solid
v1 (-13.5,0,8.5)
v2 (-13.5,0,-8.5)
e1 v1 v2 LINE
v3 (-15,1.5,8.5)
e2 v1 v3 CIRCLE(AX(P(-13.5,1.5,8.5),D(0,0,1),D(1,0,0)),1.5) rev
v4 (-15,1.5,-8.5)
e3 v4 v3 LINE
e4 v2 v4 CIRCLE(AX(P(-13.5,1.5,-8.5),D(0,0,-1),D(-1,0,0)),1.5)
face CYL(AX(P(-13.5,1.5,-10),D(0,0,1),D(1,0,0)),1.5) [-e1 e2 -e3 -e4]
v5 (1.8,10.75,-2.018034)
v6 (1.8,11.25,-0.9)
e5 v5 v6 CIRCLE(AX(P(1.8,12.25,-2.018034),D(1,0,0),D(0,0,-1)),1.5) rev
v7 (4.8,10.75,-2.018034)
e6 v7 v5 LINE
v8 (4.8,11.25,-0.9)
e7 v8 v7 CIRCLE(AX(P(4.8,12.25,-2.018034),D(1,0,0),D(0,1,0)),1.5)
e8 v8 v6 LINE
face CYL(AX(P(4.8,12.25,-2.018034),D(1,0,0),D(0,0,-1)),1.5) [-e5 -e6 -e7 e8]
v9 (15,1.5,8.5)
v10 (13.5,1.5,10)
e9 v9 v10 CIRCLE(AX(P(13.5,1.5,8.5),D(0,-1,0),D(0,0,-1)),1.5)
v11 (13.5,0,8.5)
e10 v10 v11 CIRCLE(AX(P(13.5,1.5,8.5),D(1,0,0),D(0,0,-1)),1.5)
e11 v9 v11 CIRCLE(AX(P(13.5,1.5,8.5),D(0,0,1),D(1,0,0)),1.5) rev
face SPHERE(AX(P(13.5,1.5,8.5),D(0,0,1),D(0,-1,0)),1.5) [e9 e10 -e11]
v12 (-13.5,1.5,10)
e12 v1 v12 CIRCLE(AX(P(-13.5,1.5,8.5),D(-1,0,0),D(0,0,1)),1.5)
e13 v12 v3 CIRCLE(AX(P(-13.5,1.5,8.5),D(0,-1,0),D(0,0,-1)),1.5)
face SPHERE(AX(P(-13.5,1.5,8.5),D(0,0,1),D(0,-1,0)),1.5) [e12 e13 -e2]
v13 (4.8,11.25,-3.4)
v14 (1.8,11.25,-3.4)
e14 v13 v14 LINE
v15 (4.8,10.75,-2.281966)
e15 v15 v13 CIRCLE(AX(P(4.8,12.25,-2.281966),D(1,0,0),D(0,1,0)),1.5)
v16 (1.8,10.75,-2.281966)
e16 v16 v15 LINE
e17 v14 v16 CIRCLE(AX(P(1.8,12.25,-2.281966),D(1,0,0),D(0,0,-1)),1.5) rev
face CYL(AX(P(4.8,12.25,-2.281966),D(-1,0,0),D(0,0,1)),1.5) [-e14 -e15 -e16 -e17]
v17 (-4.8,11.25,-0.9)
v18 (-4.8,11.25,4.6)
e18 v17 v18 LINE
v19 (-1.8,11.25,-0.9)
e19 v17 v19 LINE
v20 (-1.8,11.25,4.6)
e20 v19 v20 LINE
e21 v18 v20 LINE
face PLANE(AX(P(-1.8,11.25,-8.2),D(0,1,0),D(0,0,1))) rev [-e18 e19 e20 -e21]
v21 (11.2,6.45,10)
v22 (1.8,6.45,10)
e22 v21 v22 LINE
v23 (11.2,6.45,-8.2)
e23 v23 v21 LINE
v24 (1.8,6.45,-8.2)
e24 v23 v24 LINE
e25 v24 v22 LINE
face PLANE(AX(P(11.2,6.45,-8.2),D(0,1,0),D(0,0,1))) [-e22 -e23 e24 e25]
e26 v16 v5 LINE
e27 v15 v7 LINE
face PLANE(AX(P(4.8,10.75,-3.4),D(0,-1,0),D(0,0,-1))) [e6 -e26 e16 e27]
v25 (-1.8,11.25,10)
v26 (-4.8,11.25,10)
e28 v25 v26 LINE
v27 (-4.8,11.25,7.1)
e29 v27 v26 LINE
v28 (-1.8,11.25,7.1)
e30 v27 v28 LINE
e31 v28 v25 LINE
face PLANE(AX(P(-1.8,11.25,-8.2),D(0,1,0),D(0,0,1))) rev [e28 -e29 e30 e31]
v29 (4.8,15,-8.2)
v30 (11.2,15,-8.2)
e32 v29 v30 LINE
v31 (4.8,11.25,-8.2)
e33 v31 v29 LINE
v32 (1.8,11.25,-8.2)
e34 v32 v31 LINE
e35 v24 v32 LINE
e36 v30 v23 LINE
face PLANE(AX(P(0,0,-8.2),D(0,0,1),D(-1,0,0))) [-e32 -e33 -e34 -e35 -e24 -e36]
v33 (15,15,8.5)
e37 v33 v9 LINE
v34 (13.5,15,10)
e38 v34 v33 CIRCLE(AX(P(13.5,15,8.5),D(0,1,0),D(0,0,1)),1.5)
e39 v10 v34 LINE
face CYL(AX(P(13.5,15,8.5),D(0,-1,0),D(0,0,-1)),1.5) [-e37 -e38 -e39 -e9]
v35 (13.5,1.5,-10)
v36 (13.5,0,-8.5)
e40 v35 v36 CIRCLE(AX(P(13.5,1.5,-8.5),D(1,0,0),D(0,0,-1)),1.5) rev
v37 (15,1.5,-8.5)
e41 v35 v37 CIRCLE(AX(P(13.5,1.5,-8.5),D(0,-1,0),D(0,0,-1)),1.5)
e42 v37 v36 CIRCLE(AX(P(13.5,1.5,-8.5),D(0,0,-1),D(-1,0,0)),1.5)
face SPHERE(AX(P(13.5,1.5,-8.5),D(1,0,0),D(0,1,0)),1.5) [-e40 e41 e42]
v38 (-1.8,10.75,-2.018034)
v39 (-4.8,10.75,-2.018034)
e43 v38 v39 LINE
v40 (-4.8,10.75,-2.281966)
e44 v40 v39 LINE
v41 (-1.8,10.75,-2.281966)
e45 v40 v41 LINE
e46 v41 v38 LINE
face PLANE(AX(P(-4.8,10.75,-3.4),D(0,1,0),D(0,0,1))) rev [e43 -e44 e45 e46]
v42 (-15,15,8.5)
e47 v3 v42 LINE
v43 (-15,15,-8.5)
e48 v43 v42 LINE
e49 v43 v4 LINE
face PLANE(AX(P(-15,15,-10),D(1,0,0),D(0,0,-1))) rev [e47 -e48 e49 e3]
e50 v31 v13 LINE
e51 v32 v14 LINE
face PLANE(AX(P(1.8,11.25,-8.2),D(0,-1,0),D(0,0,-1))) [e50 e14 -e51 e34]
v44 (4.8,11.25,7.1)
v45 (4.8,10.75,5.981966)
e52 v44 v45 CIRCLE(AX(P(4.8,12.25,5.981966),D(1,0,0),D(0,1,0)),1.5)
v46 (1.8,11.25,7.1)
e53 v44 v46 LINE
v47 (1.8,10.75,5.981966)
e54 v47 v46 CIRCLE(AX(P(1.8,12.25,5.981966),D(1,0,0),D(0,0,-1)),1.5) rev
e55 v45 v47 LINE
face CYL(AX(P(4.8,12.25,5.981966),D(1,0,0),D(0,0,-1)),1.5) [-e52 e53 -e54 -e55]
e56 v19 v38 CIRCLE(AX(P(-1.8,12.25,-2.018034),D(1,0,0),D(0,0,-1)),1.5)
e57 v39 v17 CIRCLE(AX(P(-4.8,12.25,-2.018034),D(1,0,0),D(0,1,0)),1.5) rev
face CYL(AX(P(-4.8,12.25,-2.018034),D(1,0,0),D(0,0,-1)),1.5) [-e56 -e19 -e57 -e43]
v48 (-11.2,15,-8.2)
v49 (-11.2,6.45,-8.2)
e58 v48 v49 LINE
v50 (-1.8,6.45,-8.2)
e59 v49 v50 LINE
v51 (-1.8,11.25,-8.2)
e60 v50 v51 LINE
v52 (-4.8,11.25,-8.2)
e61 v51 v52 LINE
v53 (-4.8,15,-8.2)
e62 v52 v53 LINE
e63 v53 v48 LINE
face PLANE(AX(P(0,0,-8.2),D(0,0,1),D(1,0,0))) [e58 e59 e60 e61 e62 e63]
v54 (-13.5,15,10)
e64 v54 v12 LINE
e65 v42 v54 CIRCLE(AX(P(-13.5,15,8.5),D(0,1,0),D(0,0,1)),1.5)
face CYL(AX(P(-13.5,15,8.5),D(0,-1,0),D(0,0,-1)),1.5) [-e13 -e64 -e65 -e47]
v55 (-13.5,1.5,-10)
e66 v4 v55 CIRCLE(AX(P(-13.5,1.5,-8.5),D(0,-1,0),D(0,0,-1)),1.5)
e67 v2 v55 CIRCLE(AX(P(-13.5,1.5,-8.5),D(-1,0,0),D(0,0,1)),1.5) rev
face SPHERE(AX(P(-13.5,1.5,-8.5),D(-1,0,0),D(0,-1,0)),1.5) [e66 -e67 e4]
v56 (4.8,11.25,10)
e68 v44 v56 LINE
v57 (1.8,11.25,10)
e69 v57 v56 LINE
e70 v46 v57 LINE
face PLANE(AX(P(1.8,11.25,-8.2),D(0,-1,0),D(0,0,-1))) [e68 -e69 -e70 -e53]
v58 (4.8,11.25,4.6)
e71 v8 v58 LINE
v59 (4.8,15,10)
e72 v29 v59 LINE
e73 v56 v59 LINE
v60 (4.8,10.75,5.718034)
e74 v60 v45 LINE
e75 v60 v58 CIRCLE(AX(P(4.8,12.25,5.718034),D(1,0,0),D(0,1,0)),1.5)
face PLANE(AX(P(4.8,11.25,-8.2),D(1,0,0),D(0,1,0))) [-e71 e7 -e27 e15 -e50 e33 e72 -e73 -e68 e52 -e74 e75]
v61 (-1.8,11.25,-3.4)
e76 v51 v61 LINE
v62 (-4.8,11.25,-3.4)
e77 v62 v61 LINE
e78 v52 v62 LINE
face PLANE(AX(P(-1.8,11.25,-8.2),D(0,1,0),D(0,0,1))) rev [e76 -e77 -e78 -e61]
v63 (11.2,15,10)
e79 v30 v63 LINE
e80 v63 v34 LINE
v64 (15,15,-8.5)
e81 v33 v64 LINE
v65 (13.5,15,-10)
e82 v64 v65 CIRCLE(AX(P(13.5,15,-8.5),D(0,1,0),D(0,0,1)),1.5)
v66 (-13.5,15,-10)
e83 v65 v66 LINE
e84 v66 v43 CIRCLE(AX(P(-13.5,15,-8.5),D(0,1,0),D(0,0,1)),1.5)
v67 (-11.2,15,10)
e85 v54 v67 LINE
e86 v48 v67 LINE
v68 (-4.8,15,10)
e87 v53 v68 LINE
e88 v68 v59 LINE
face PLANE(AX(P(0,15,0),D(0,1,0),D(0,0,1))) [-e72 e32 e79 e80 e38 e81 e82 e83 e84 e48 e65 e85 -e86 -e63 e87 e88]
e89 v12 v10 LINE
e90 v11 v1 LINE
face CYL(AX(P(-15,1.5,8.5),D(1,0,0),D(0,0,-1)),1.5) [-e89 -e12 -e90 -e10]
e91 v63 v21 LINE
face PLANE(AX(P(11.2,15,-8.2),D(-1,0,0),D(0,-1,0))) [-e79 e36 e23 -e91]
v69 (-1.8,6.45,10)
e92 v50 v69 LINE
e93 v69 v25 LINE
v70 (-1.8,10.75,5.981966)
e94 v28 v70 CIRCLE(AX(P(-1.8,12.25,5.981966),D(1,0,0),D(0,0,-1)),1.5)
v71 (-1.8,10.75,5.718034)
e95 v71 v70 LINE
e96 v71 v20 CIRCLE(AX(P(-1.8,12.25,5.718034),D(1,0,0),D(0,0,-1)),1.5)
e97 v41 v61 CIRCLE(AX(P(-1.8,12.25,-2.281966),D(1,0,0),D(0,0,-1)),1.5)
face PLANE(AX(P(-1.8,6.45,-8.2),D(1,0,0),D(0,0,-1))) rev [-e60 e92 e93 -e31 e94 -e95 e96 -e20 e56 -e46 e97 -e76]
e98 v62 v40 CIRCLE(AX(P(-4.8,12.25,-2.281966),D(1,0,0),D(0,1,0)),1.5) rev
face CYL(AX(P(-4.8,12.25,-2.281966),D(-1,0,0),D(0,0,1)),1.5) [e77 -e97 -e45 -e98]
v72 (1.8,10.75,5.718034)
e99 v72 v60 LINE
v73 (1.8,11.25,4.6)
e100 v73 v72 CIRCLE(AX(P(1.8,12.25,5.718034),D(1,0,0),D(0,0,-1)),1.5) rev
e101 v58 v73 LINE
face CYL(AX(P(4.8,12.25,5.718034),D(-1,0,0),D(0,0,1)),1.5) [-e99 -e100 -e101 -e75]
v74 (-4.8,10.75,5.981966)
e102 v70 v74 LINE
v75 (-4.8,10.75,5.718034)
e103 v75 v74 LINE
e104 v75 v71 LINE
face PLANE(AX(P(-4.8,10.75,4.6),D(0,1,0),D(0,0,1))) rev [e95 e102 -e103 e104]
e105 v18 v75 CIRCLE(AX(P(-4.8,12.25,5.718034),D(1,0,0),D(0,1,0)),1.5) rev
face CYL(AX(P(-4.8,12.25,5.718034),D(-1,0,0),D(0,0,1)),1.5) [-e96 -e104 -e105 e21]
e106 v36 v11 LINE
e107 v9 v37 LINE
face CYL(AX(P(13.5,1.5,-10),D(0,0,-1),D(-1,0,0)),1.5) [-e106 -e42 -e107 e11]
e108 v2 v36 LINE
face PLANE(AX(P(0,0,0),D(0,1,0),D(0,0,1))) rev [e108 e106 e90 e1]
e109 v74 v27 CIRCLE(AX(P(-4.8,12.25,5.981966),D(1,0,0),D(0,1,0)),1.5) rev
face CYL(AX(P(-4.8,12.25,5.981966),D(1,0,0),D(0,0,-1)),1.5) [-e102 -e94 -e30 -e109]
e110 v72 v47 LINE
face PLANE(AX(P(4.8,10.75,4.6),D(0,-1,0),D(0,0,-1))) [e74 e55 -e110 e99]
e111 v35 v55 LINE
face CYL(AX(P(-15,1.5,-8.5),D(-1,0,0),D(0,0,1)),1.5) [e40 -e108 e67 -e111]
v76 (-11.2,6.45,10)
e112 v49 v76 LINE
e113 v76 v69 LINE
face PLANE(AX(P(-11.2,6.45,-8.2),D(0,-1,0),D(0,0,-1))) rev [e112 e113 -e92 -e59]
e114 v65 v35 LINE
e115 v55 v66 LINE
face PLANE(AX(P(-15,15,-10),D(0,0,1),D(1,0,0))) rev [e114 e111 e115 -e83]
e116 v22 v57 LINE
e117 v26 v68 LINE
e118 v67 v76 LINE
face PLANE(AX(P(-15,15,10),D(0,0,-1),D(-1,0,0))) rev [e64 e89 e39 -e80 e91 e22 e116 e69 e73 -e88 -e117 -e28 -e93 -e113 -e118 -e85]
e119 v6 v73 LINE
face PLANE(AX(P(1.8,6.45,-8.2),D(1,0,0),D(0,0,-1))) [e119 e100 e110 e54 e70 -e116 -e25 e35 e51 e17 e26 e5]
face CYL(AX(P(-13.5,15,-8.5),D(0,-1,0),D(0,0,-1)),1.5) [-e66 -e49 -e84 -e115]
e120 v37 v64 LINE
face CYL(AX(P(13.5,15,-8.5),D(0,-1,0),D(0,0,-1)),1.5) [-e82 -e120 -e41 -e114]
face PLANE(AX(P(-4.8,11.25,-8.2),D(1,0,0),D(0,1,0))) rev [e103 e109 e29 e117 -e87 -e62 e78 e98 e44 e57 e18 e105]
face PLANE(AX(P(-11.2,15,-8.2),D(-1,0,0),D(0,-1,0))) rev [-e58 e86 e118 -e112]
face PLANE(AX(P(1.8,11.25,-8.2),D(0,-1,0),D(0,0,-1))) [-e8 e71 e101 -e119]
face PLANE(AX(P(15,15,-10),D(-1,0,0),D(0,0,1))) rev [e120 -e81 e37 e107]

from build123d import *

# Parameters (mm, degrees)
SKETCH2_W            = 30
SKETCH2_H            = 20
BOSS_EXTRUDE1_DEPTH  = 15
CUT_EXTRUDE1_DEPTH   = 18.2
SKETCH4_W            = 2.5
SKETCH4_H            = 0.5
BOSS_EXTRUDE2_DEPTH  = 3
FILLET1_R            = 1.5
FILLET1_OF_MIRROR2_R = 1.5
FILLET2_R            = 1.5


with BuildPart() as part:
    # Sketch2 → Boss-Extrude1 (new body)
    with BuildSketch(Plane(origin=(0, 0, 0), x_dir=(1, 0, 0), z_dir=(0, 1, 0))):
        Rectangle(SKETCH2_W, SKETCH2_H)
    extrude(amount=BOSS_EXTRUDE1_DEPTH)

    # Sketch3 → Cut-Extrude1 (cut)
    with BuildSketch(Plane.XY.offset(10)):
        Polygon((-11.2, 15), (-11.2, 6.45), (-1.8, 6.45), (-1.8, 11.25), (-4.8, 11.25), (-4.8, 15), align=None)
    cut_extrude1 = extrude(amount=-CUT_EXTRUDE1_DEPTH, mode=Mode.SUBTRACT)

    # Sketch4 → Boss-Extrude2 (add)
    with BuildSketch(Plane.ZY.offset(1.8)):
        with Locations((5.85, 11)):
            Rectangle(SKETCH4_W, SKETCH4_H)
        with Locations((-2.15, 11)):
            Rectangle(SKETCH4_W, SKETCH4_H)
    boss_extrude2 = extrude(amount=BOSS_EXTRUDE2_DEPTH)

    # Fillet1
    # the kernel refuses this fillet: 1.5 mm, written as the material it takes off along each edge
    with BuildSketch(Plane(origin=(-1.8, 10.75, 4.6), x_dir=(0, 0, 1), z_dir=(-1, 0, 0)), Plane(origin=(-1.8, 10.75, -3.4), x_dir=(0, 0, 1), z_dir=(-1, 0, 0))) as fillet1_piece_1:
        with BuildLine():
            CenterArc((1.118033989, 1.5), FILLET1_R, 221.810314896, 48.189685104)
            Line((0, 0.5), (-0.02236068, 0.48))
            ThreePointArc((-0.02236068, 0.48), (-0.03, 0.25), (-0.03, 0))
            Line((-0.03, 0), (0, -0.03))
            Line((0, -0.03), (1.118033989, -0.03))
            Line((1.118033989, -0.03), (1.118033989, 0))
        make_face()
    extrude(amount=5.795084972, mode=Mode.SUBTRACT)
    with BuildSketch(Plane(origin=(-1.8, 10.75, 7.1), x_dir=(0, 1, 0), z_dir=(-1, 0, 0)), Plane(origin=(-1.8, 10.75, -0.9), x_dir=(0, 1, 0), z_dir=(-1, 0, 0))) as fillet1_piece_2:
        with BuildLine():
            CenterArc((1.5, 1.118033989), FILLET1_R, 180, 48.189685104)
            Line((0, 1.118033989), (-0.03, 1.118033989))
            Line((-0.03, 1.118033989), (-0.03, 0))
            Line((-0.03, 0), (0, -0.03))
            ThreePointArc((0, -0.03), (0.25, -0.03), (0.48, -0.02236068))
            Line((0.48, -0.02236068), (0.5, 0))
        make_face()
    extrude(amount=5.795084972, mode=Mode.SUBTRACT)

    # Mirror2: Cut-Extrude1, Boss-Extrude2 across plane
    add(cut_extrude1.mirror(Plane(origin=(0, 0, 0), x_dir=(0, 0, 1), z_dir=(1, 0, 0))), mode=Mode.SUBTRACT)
    add(boss_extrude2.mirror(Plane(origin=(0, 0, 0), x_dir=(0, 0, 1), z_dir=(1, 0, 0))))

    # Fillet1 of Mirror2
    # the kernel refuses this fillet: 1.5 mm, written as the material it takes off along each edge
    with BuildSketch(Plane(origin=(1.8, 10.75, 4.6), x_dir=(0, 0, 1), z_dir=(1, 0, 0)), Plane(origin=(1.8, 10.75, -3.4), x_dir=(0, 0, 1), z_dir=(1, 0, 0))) as fillet1_of_mirror2_piece_1:
        with BuildLine():
            CenterArc((1.118033989, -1.5), FILLET1_OF_MIRROR2_R, 90, 48.189685104)
            Line((0, -0.5), (-0.02236068, -0.48))
            ThreePointArc((-0.02236068, -0.48), (-0.03, -0.25), (-0.03, 0))
            Line((-0.03, 0), (0, 0.03))
            Line((0, 0.03), (1.118033989, 0.03))
            Line((1.118033989, 0.03), (1.118033989, 0))
        make_face()
    extrude(amount=5.795084972, mode=Mode.SUBTRACT)
    with BuildSketch(Plane(origin=(1.8, 10.75, 7.1), x_dir=(0, 1, 0), z_dir=(1, 0, 0)), Plane(origin=(1.8, 10.75, -0.9), x_dir=(0, 1, 0), z_dir=(1, 0, 0))) as fillet1_of_mirror2_piece_2:
        with BuildLine():
            CenterArc((1.5, -1.118033989), FILLET1_OF_MIRROR2_R, 131.810314896, 48.189685104)
            Line((0, -1.118033989), (-0.03, -1.118033989))
            Line((-0.03, -1.118033989), (-0.03, 0))
            Line((-0.03, 0), (0, 0.03))
            ThreePointArc((0, 0.03), (0.25, 0.03), (0.48, 0.02236068))
            Line((0.48, 0.02236068), (0.5, 0))
        make_face()
    extrude(amount=5.795084972, mode=Mode.SUBTRACT)

    # Fillet2
    fillet2_edges = [part.edges().sort_by_distance(p)[0] for p in [
        (0, 0, 10),
        (-15, 0, 0),
        (0, 0, -10),
        (15, 0, 0),
        (15, 7.5, 10),
        (-15, 7.5, 10),
        (-15, 7.5, -10),
        (15, 7.5, -10),
    ]]
    fillet(fillet2_edges, radius=FILLET2_R)


solid = part.part
